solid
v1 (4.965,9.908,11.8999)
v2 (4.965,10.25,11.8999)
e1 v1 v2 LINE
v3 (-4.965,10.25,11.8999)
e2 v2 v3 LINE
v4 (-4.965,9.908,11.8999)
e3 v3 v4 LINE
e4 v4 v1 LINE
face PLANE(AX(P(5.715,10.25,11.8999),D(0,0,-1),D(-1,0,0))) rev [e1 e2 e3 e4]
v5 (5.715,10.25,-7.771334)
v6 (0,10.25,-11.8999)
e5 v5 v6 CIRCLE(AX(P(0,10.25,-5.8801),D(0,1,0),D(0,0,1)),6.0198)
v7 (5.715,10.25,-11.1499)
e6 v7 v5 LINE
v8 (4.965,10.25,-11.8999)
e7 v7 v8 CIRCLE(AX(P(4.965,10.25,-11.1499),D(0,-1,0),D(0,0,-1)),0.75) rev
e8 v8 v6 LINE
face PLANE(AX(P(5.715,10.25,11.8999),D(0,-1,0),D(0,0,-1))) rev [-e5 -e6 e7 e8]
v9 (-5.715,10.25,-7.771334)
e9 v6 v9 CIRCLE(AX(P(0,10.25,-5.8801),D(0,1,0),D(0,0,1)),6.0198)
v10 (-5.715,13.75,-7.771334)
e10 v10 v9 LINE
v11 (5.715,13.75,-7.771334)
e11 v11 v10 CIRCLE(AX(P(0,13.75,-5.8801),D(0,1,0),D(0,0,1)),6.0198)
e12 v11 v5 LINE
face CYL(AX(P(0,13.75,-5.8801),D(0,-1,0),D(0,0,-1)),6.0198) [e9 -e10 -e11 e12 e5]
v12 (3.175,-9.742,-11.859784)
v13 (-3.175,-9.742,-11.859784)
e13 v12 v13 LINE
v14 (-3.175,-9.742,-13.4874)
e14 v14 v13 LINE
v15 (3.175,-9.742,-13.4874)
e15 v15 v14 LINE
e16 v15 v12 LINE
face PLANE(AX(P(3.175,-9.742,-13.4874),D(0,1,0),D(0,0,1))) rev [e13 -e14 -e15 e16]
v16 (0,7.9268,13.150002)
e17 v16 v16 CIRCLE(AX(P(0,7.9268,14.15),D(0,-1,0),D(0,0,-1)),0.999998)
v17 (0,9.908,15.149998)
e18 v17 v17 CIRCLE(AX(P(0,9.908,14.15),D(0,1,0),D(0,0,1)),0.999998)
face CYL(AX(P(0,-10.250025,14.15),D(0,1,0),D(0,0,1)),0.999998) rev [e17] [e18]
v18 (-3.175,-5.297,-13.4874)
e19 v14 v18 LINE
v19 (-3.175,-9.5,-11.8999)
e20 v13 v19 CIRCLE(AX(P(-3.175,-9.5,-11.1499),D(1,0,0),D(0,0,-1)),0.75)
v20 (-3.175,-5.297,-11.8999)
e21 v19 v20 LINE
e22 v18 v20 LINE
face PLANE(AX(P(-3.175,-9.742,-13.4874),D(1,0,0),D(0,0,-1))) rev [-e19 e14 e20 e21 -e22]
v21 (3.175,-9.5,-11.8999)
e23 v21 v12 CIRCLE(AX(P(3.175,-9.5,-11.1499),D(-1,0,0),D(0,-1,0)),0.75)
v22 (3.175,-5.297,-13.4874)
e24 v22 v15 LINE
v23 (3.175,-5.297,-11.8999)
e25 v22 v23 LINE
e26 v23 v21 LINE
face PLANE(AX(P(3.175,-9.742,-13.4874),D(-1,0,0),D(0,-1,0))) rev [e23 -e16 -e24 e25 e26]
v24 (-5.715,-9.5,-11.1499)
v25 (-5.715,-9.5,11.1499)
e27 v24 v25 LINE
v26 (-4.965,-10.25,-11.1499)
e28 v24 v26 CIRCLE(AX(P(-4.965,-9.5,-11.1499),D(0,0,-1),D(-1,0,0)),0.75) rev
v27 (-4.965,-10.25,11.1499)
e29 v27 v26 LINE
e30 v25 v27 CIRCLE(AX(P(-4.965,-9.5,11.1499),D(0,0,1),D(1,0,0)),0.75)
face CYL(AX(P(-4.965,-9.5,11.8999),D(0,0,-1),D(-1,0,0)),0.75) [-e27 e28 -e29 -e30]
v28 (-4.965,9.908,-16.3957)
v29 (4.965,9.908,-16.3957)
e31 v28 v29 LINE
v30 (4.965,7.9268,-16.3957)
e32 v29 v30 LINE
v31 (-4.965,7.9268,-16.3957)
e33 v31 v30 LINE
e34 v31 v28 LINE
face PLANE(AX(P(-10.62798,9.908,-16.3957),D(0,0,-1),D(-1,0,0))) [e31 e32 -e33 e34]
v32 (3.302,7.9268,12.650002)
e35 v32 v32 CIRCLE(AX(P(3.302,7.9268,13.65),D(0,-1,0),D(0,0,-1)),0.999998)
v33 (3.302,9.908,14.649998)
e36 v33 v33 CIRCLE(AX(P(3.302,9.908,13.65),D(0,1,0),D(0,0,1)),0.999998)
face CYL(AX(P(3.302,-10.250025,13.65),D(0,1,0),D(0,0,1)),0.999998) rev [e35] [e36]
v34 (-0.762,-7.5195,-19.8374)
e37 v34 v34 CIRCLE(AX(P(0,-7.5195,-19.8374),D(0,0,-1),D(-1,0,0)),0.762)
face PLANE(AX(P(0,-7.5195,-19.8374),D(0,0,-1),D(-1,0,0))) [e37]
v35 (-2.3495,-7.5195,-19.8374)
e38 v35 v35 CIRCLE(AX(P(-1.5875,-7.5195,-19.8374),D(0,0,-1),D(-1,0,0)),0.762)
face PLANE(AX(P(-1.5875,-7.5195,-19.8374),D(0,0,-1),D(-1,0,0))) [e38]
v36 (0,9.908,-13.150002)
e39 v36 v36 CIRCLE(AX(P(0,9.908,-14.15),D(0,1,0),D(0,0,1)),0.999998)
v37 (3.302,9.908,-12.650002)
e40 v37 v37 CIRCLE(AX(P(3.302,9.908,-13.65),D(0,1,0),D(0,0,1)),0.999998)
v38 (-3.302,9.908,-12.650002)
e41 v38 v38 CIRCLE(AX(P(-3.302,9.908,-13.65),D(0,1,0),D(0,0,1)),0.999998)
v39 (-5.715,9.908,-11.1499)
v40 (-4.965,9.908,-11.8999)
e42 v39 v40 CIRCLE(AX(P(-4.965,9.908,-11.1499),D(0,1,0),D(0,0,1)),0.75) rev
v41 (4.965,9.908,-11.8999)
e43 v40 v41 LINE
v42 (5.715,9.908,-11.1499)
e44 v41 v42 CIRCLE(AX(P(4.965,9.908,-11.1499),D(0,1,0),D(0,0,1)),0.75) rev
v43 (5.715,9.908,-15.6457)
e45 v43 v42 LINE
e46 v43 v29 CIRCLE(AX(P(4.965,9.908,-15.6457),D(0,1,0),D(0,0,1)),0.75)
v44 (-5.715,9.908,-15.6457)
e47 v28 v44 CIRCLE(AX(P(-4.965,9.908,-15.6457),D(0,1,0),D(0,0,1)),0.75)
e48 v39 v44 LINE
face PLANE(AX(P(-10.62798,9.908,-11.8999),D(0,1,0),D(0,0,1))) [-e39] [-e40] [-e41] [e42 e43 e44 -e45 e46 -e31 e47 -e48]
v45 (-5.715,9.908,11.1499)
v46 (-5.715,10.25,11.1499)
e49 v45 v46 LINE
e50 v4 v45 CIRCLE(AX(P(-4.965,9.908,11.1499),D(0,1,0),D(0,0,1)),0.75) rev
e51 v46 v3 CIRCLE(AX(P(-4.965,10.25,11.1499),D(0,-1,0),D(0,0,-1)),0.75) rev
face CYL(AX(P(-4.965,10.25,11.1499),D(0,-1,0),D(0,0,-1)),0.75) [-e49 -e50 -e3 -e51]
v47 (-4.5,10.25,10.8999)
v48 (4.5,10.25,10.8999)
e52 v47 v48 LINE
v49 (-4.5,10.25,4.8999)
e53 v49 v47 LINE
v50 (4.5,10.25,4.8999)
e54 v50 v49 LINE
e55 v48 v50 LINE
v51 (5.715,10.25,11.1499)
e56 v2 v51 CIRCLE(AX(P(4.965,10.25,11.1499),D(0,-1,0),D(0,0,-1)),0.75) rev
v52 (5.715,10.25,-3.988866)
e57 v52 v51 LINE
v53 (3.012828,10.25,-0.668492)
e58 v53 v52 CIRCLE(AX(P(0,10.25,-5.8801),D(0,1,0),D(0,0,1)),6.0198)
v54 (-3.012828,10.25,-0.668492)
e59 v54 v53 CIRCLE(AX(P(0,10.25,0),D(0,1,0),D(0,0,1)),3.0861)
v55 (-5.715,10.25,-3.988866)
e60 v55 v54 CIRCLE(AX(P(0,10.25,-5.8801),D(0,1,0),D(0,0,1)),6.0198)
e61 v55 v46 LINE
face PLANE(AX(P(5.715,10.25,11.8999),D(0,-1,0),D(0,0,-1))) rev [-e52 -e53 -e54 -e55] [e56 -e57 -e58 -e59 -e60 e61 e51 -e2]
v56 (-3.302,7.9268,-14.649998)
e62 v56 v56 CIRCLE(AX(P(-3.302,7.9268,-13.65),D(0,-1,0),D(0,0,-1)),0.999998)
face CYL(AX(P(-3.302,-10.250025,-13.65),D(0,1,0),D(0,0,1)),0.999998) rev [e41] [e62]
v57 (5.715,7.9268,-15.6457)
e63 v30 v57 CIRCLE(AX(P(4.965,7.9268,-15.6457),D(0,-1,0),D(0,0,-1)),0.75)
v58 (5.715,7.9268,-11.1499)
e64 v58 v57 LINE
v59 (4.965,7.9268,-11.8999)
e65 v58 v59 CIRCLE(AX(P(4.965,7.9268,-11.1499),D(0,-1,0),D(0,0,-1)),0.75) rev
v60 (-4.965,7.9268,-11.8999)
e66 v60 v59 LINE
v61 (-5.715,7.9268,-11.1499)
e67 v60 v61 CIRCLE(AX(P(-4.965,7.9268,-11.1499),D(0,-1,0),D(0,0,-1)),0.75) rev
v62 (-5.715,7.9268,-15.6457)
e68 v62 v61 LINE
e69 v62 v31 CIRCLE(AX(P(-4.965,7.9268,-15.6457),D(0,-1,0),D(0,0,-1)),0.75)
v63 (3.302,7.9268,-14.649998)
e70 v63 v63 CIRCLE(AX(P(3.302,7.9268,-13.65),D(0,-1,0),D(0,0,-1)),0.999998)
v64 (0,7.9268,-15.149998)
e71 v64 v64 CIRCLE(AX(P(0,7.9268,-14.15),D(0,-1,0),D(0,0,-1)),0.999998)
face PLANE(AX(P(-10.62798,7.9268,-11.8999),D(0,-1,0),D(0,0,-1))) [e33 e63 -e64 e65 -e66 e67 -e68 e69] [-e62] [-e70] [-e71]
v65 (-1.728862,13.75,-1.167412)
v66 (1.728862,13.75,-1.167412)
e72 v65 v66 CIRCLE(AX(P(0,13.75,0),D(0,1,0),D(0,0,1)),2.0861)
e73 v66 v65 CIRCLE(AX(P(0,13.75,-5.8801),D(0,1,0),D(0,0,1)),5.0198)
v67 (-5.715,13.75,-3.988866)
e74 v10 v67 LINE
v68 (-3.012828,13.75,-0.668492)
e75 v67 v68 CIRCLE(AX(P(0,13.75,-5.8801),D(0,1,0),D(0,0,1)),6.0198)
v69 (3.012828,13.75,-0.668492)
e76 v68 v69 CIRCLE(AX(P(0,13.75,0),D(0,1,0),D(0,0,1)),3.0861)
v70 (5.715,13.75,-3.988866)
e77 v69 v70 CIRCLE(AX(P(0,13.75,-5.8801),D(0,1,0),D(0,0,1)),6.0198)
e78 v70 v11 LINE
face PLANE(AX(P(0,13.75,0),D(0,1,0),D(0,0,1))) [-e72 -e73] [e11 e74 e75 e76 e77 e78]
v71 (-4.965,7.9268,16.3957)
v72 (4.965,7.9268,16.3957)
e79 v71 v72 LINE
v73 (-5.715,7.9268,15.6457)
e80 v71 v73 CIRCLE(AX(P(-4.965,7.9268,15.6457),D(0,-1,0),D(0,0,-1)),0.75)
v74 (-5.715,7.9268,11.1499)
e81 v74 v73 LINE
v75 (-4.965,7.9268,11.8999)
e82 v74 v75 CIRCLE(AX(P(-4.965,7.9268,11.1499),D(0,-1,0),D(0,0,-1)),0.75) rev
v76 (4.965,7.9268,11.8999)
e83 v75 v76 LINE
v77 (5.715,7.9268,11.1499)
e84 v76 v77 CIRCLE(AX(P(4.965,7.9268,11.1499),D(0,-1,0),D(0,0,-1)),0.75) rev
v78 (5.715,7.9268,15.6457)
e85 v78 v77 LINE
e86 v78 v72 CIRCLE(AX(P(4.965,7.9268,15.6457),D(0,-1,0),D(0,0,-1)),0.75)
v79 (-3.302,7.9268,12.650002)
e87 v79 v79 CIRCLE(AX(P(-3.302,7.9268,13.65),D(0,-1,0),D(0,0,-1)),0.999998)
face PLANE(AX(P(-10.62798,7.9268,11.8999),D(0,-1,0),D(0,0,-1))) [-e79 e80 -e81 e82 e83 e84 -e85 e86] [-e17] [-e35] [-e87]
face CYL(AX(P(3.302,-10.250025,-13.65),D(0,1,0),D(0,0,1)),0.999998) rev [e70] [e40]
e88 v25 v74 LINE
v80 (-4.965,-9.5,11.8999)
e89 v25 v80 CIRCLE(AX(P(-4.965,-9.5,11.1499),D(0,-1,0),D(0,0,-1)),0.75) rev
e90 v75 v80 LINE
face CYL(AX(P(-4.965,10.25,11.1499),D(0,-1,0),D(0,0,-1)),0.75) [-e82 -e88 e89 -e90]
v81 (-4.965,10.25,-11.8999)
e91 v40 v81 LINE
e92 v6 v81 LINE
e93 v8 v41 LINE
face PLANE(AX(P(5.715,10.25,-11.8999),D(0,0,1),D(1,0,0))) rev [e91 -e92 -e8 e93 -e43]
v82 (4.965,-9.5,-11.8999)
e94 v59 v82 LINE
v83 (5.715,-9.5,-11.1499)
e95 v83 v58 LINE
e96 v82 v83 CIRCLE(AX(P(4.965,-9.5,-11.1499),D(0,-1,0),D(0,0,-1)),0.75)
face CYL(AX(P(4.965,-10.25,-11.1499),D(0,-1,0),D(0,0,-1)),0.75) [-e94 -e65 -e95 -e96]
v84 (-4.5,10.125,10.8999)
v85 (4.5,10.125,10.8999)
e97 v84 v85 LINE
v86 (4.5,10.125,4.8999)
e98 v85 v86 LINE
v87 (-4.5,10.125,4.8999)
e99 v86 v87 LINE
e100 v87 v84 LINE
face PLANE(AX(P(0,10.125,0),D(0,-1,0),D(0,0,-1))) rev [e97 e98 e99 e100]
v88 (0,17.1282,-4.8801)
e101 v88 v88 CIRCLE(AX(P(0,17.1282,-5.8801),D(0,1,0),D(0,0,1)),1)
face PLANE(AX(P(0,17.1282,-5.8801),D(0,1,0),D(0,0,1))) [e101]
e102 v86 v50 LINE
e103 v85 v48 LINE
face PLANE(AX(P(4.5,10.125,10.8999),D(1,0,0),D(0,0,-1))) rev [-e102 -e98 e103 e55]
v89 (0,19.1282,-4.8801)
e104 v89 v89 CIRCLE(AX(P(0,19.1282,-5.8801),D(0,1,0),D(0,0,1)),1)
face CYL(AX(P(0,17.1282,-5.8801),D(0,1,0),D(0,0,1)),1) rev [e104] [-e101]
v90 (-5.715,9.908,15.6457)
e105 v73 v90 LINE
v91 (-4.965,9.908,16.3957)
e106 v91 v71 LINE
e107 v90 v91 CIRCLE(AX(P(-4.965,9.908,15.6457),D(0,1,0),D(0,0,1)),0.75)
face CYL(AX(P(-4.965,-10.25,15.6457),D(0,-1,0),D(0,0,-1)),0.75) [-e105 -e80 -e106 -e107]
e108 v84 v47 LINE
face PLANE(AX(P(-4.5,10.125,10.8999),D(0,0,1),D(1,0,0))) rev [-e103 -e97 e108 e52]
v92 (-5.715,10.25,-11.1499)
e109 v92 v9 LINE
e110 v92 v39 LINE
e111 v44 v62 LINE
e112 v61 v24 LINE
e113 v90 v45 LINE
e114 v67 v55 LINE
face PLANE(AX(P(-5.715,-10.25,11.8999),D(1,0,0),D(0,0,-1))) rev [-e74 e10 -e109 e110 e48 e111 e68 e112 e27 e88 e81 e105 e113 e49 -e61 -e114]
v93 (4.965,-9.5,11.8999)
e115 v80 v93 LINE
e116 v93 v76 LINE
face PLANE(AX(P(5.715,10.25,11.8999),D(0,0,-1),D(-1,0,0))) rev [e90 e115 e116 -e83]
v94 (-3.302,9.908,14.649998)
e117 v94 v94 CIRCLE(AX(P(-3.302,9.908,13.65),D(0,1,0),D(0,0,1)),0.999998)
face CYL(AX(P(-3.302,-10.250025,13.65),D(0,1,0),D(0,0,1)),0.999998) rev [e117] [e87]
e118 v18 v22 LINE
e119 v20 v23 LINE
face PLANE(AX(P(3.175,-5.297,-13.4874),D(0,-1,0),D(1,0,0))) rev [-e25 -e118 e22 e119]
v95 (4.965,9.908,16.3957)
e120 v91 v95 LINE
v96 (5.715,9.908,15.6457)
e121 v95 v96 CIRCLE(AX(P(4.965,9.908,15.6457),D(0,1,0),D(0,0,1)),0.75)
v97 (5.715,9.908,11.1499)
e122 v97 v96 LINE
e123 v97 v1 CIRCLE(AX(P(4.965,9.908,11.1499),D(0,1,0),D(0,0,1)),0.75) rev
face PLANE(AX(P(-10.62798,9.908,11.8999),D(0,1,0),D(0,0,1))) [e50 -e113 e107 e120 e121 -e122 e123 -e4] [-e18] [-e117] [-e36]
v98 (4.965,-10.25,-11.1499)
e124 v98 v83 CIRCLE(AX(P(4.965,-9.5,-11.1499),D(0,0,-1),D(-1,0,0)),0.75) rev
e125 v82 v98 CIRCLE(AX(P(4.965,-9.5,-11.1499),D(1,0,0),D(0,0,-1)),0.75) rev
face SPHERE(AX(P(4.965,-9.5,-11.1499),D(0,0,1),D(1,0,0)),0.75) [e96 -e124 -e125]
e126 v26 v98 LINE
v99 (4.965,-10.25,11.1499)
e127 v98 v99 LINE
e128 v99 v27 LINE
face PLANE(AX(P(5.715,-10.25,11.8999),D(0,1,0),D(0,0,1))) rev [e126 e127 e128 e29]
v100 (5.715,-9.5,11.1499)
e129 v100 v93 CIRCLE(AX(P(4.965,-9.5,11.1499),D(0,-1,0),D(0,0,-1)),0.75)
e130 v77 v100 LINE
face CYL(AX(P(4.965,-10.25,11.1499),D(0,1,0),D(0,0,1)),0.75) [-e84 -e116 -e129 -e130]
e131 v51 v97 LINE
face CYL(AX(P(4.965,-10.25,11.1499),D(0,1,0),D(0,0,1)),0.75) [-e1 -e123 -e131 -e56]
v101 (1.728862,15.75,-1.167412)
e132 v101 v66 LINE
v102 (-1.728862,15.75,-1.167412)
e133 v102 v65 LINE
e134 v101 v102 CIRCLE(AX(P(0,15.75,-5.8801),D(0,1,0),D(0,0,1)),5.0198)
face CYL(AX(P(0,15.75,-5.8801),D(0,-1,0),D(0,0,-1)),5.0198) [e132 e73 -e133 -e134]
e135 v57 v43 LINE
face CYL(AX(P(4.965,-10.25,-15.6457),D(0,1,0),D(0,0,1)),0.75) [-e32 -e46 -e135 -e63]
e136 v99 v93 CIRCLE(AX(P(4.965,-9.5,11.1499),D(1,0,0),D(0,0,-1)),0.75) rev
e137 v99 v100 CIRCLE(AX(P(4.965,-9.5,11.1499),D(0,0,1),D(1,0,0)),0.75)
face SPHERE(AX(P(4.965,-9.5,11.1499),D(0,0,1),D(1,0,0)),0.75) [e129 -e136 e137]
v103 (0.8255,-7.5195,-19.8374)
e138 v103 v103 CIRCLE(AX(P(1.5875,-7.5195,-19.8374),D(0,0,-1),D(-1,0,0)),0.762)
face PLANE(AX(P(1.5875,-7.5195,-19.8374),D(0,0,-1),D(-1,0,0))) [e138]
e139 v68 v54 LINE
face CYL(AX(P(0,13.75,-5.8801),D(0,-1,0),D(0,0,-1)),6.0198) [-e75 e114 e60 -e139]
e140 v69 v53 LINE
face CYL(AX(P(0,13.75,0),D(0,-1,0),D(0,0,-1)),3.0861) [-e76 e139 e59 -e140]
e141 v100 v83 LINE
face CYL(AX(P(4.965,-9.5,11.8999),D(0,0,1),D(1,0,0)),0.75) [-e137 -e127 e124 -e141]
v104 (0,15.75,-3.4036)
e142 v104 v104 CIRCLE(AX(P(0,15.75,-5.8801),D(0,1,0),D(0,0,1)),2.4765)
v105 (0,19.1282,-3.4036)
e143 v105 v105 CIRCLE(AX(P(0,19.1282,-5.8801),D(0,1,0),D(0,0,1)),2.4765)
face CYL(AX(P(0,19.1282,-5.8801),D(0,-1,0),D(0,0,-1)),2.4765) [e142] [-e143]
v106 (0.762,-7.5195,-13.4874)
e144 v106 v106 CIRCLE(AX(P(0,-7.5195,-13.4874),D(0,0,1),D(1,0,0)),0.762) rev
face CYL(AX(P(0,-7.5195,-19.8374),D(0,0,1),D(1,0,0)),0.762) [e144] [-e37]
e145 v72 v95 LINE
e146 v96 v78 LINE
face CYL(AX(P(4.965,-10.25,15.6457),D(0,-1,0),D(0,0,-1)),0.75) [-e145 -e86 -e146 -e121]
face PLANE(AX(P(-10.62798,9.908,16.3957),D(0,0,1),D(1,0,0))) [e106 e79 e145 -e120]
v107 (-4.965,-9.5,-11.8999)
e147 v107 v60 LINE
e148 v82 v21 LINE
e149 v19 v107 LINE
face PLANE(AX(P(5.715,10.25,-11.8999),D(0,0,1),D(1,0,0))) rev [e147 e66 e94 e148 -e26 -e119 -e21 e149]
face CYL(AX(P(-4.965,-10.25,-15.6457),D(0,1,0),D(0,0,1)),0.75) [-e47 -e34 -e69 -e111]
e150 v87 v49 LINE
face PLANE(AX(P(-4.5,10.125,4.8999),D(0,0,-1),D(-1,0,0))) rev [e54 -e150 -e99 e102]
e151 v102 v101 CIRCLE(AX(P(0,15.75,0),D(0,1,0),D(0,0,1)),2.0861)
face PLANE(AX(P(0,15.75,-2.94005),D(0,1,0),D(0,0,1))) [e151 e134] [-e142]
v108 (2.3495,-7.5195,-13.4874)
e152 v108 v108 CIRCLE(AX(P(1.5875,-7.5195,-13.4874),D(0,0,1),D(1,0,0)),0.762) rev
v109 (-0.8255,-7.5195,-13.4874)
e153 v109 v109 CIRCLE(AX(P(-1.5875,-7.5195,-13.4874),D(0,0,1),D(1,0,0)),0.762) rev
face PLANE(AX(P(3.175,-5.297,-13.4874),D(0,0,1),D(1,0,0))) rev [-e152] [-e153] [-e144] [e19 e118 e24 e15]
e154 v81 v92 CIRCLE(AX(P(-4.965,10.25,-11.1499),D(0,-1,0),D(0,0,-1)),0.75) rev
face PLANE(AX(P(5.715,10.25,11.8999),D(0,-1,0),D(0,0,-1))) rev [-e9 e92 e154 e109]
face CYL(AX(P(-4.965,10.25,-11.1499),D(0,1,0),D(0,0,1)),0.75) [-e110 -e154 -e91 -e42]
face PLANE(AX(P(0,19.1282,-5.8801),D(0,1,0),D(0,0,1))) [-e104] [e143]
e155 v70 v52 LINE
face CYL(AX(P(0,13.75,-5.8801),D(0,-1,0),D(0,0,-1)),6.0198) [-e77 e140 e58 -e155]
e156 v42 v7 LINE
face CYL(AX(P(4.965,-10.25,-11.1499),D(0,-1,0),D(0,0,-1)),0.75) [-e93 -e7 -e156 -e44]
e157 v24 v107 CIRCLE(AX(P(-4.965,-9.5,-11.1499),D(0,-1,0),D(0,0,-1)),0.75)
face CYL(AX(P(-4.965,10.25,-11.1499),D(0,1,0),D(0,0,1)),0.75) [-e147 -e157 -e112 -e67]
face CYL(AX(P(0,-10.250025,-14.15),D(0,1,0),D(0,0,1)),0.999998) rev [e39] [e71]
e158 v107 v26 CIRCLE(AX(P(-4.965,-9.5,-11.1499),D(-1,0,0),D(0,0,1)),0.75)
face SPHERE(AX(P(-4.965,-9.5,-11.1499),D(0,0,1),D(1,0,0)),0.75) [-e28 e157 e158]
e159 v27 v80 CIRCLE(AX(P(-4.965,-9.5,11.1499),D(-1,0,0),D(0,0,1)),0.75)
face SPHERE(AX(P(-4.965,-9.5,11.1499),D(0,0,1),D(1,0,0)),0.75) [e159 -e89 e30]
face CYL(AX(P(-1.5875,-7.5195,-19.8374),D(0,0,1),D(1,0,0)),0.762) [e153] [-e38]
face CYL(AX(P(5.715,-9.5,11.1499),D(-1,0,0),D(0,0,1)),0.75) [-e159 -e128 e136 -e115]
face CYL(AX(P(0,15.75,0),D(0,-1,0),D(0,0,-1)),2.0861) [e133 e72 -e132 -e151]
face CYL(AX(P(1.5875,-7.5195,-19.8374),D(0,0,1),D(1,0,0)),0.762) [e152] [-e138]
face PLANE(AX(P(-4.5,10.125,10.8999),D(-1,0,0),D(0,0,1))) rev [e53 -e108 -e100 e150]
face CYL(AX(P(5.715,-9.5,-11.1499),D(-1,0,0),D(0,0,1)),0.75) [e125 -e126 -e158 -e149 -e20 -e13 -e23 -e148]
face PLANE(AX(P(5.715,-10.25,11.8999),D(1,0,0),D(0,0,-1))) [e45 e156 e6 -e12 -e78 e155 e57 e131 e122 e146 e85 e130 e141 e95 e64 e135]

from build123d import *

# Parameters (mm, degrees)
EXTRUDE1_DEPTH      = 5.715
EXTRUDE1_DEPTH_BACK = 5.715
SKETCH1_W           = 23.7998
SKETCH1_H           = 20.5
BOSS_EXTRUDE7_DEPTH = 3.5
BOSS_EXTRUDE8_DEPTH = 2
SKETCH3_W           = 4.4958
SKETCH3_H           = 1.9812
EXTRUDE2_DEPTH      = 11.43
SKETCH4_R           = 0.999998
EXTRUDE3_DEPTH      = 27.604983884
SKETCH5_W           = 6.35
SKETCH5_H           = 4.445
BOSS_EXTRUDE1_DEPTH = 1.5875
SKETCH6_R           = 0.762
BOSS_EXTRUDE4_DEPTH = 6.35
SKETCH8_R           = 2.4765
BOSS_EXTRUDE6_DEPTH = 3.3782
SKETCH9_W           = 9
SKETCH9_H           = 6
CUT_EXTRUDE2_DEPTH  = 0.125
SKETCH11_R          = 1
CUT_EXTRUDE3_DEPTH  = 2
FILLET1_R           = 0.75


with BuildPart() as part:
    # Sketch1 → Extrude1 (new, two sides: drawn at the far end of the back side and taken through both)
    with BuildSketch(Plane(origin=(0, 0, 0), x_dir=(0, 0, -1), z_dir=(1, 0, 0)).offset(-EXTRUDE1_DEPTH_BACK)):
        Rectangle(SKETCH1_W, SKETCH1_H)
    extrude(amount=EXTRUDE1_DEPTH + EXTRUDE1_DEPTH_BACK)

    # Sketch2 → Boss-Extrude7 (add)
    with BuildSketch(Plane(origin=(0, 10.25, 0), x_dir=(-1, 0, 0), z_dir=(0, 1, 0))):
        with BuildLine():
            Line((5.715, -7.771334264), (5.715, -3.988865736))
            ThreePointArc((5.715, -3.988865736), (4.669043342, -2.080359705), (3.012827896, -0.668491793))
            ThreePointArc((3.012827896, -0.668491793), (0, 3.0861), (-3.012827896, -0.668491793))
            ThreePointArc((-3.012827896, -0.668491793), (-4.669043342, -2.080359705), (-5.715, -3.988865736))
            Line((-5.715, -3.988865736), (-5.715, -7.771334264))
            ThreePointArc((-5.715, -7.771334264), (0, -11.8999), (5.715, -7.771334264))
        make_face()
    extrude(amount=BOSS_EXTRUDE7_DEPTH)

    # Sketch10 → Boss-Extrude8 (add)
    with BuildSketch(Plane(origin=(0, 13.75, 0), x_dir=(1, 0, 0), z_dir=(0, 1, 0))):
        with BuildLine():
            ThreePointArc((-1.728861682, 1.167411879), (0, -2.0861), (1.728861682, 1.167411879))
            ThreePointArc((1.728861682, 1.167411879), (0, 10.8999), (-1.728861682, 1.167411879))
        make_face()
    extrude(amount=BOSS_EXTRUDE8_DEPTH)

    # Sketch3 → Extrude2 (add)
    with BuildSketch(Plane(origin=(5.715, 0, 0), x_dir=(0, 0, -1), z_dir=(1, 0, 0))):
        with Locations((-14.1478, 8.9174)):
            Rectangle(SKETCH3_W, SKETCH3_H)
        with Locations((14.1478, 8.9174)):
            Rectangle(SKETCH3_W, SKETCH3_H)
    extrude(amount=-EXTRUDE2_DEPTH)

    # Sketch4 → Extrude3 (cut, through all)
    with BuildSketch(Plane(origin=(0, 9.908, 0), x_dir=(1, 0, 0), z_dir=(0, 1, 0))):
        with Locations(Location((0, 14.15, 0), (0, 0, 270))):
            Circle(SKETCH4_R)
        with Locations(Location((0, -14.15, 0), (0, 0, 270))):
            Circle(SKETCH4_R)
        with Locations(Location((-3.302, 13.65, 0), (0, 0, 270))):
            Circle(SKETCH4_R)
        with Locations(Location((3.302, 13.65, 0), (0, 0, 270))):
            Circle(SKETCH4_R)
        with Locations(Location((3.302, -13.65, 0), (0, 0, 270))):
            Circle(SKETCH4_R)
        with Locations(Location((-3.302, -13.65, 0), (0, 0, 270))):
            Circle(SKETCH4_R)
    extrude(amount=-EXTRUDE3_DEPTH, mode=Mode.SUBTRACT)

    # Sketch5 → Boss-Extrude1 (add)
    with BuildSketch(Plane(origin=(0, 0, -11.8999), x_dir=(-1, 0, 0), z_dir=(0, 0, -1))):
        with Locations((0, -7.5195)):
            Rectangle(SKETCH5_W, SKETCH5_H)
    extrude(amount=BOSS_EXTRUDE1_DEPTH)

    # Sketch6 → Boss-Extrude4 (add)
    with BuildSketch(Plane(origin=(0, 0, -13.4874), x_dir=(-1, 0, 0), z_dir=(0, 0, -1))):
        with Locations(Location((0, -7.5195, 0), (0, 0, 180))):
            Circle(SKETCH6_R)
        with Locations(Location((-1.5875, -7.5195, 0), (0, 0, 180))):
            Circle(SKETCH6_R)
        with Locations(Location((1.5875, -7.5195, 0), (0, 0, 180))):
            Circle(SKETCH6_R)
    extrude(amount=BOSS_EXTRUDE4_DEPTH)

    # Sketch8 → Boss-Extrude6 (add)
    with BuildSketch(Plane(origin=(0, 15.75, 0), x_dir=(1, 0, 0), z_dir=(0, 1, 0))):
        with Locations(Location((0, 5.8801, 0), (0, 0, 270))):
            Circle(SKETCH8_R)
    extrude(amount=BOSS_EXTRUDE6_DEPTH)

    # Sketch9 → Cut-Extrude2 (cut)
    with BuildSketch(Plane(origin=(0, 10.25, 0), x_dir=(1, 0, 0), z_dir=(0, 1, 0))):
        with Locations((0, -7.8999)):
            Rectangle(SKETCH9_W, SKETCH9_H)
    extrude(amount=-CUT_EXTRUDE2_DEPTH, mode=Mode.SUBTRACT)

    # Sketch11 → Cut-Extrude3 (cut)
    with BuildSketch(Plane(origin=(0, 19.1282, 0), x_dir=(1, 0, 0), z_dir=(0, 1, 0))):
        with Locations(Location((0, 5.8801, 0), (0, 0, 270))):
            Circle(SKETCH11_R)
    extrude(amount=-CUT_EXTRUDE3_DEPTH, mode=Mode.SUBTRACT)

    # Fillet1
    # the kernel refuses this fillet: 0.75 mm, written as the material it takes off along each edge
    with BuildSketch(Plane(origin=(-4.965, -9.5, 11.1499), x_dir=(0, -1, 0), z_dir=(-1, 0, 0))) as fillet1_piece_1_section:
        Polygon((0, 0), (FILLET1_R, 0), (FILLET1_R, FILLET1_R), (0, FILLET1_R), align=None)
    fillet1_piece_1 = extrude(amount=FILLET1_R, mode=Mode.PRIVATE)
    fillet1_piece_1 = fillet1_piece_1 - Plane(origin=(-4.965, -9.5, 11.1499), x_dir=(0, 0.7071067811865475, -0.7071067811865475), z_dir=(-1, 0, 0)) * Sphere(FILLET1_R, mode=Mode.PRIVATE)
    add(fillet1_piece_1, mode=Mode.SUBTRACT)
    with BuildSketch(Plane(origin=(-4.965, -9.5, -11.1499), x_dir=(0, 0, -1), z_dir=(-1, 0, 0))) as fillet1_piece_2_section:
        Polygon((0, 0), (FILLET1_R, 0), (FILLET1_R, FILLET1_R), (0, FILLET1_R), align=None)
    fillet1_piece_2 = extrude(amount=FILLET1_R, mode=Mode.PRIVATE)
    fillet1_piece_2 = fillet1_piece_2 - Plane(origin=(-4.965, -9.5, -11.1499), x_dir=(0, 0.7071067811865475, 0.7071067811865475), z_dir=(-1, 0, 0)) * Sphere(FILLET1_R, mode=Mode.PRIVATE)
    add(fillet1_piece_2, mode=Mode.SUBTRACT)
    with BuildSketch(Plane(origin=(4.965, -9.5, 11.1499), x_dir=(0, -1, 0), z_dir=(1, 0, 0))) as fillet1_piece_3_section:
        Polygon((0, 0), (FILLET1_R, 0), (FILLET1_R, -FILLET1_R), (0, -FILLET1_R), align=None)
    fillet1_piece_3 = extrude(amount=FILLET1_R, mode=Mode.PRIVATE)
    fillet1_piece_3 = fillet1_piece_3 - Plane(origin=(4.965, -9.5, 11.1499), x_dir=(0, 0.7071067811865475, -0.7071067811865475), z_dir=(1, 0, 0)) * Sphere(FILLET1_R, mode=Mode.PRIVATE)
    add(fillet1_piece_3, mode=Mode.SUBTRACT)
    with BuildSketch(Plane(origin=(4.965, -9.5, -11.1499), x_dir=(0, 0, -1), z_dir=(1, 0, 0))) as fillet1_piece_4_section:
        Polygon((0, 0), (FILLET1_R, 0), (FILLET1_R, -FILLET1_R), (0, -FILLET1_R), align=None)
    fillet1_piece_4 = extrude(amount=FILLET1_R, mode=Mode.PRIVATE)
    fillet1_piece_4 = fillet1_piece_4 - Plane(origin=(4.965, -9.5, -11.1499), x_dir=(0, 0.7071067811865475, 0.7071067811865475), z_dir=(1, 0, 0)) * Sphere(FILLET1_R, mode=Mode.PRIVATE)
    add(fillet1_piece_4, mode=Mode.SUBTRACT)
    with BuildSketch(Plane(origin=(-5.715, -9.5, 11.8999), x_dir=(0, 0, -1), z_dir=(0, 1, 0)), Plane(origin=(-5.715, 7.9268, -11.8999), x_dir=(0, 0, 1), z_dir=(0, -1, 0))) as fillet1_piece_5:
        with BuildLine():
            CenterArc((FILLET1_R, -FILLET1_R), FILLET1_R, 90, 90)
            Line((0, -FILLET1_R), (0, 0))
            Line((0, 0), (FILLET1_R, 0))
        make_face()
    extrude(amount=17.4268, mode=Mode.SUBTRACT)
    with BuildSketch(Plane(origin=(-5.715, 11.783, -16.3957), x_dir=(0, 0, 1), z_dir=(0, -1, 0)), Plane(origin=(5.715, 11.783, 16.3957), x_dir=(0, 0, -1), z_dir=(0, -1, 0))) as fillet1_piece_6:
        with BuildLine():
            CenterArc((FILLET1_R, -FILLET1_R), FILLET1_R, 90, 90)
            Line((0, -FILLET1_R), (0, 0))
            Line((0, 0), (FILLET1_R, 0))
        make_face()
    extrude(amount=5.7312, mode=Mode.SUBTRACT)
    with BuildSketch(Plane(origin=(5.715, 11.783, -16.3957), x_dir=(0, 0, 1), z_dir=(0, -1, 0)), Plane(origin=(-5.715, 11.783, 16.3957), x_dir=(0, 0, -1), z_dir=(0, -1, 0))) as fillet1_piece_7:
        with BuildLine():
            CenterArc((FILLET1_R, FILLET1_R), FILLET1_R, 180, 90)
            Line((0, FILLET1_R), (0, 0))
            Line((0, 0), (FILLET1_R, 0))
        make_face()
    extrude(amount=5.7312, mode=Mode.SUBTRACT)
    with BuildSketch(Plane(origin=(-5.715, 12.125, -11.8999), x_dir=(0, 0, 1), z_dir=(0, -1, 0)), Plane(origin=(5.715, 9.908, 11.8999), x_dir=(-1, 0, 0), z_dir=(0, 1, 0))) as fillet1_piece_8:
        with BuildLine():
            CenterArc((FILLET1_R, -FILLET1_R), FILLET1_R, 90, 90)
            Line((0, -FILLET1_R), (0, 0))
            Line((0, 0), (FILLET1_R, 0))
        make_face()
    extrude(amount=2.217, mode=Mode.SUBTRACT)
    with BuildSketch(Plane(origin=(5.715, 12.125, -11.8999), x_dir=(0, 0, 1), z_dir=(0, -1, 0)), Plane(origin=(-5.715, 9.908, 11.8999), x_dir=(1, 0, 0), z_dir=(0, 1, 0))) as fillet1_piece_9:
        with BuildLine():
            CenterArc((FILLET1_R, FILLET1_R), FILLET1_R, 180, 90)
            Line((0, FILLET1_R), (0, 0))
            Line((0, 0), (FILLET1_R, 0))
        make_face()
    extrude(amount=2.217, mode=Mode.SUBTRACT)
    with BuildSketch(Plane(origin=(-4.965, -10.25, 11.8999), x_dir=(0, 0, -1), z_dir=(1, 0, 0))) as fillet1_piece_10:
        with BuildLine():
            CenterArc((FILLET1_R, FILLET1_R), FILLET1_R, 180, 90)
            Line((0, FILLET1_R), (0, 0))
            Line((0, 0), (FILLET1_R, 0))
        make_face()
    extrude(amount=9.93, mode=Mode.SUBTRACT)
    with BuildSketch(Plane(origin=(4.965, -10.25, -11.8999), x_dir=(0, 1, 0), z_dir=(-1, 0, 0))) as fillet1_piece_11_section:
        with BuildLine():
            CenterArc((FILLET1_R, -FILLET1_R), FILLET1_R, 90, 90)
            Line((0, -FILLET1_R), (0, 0))
            Line((0, 0), (FILLET1_R, 0))
        make_face()
    fillet1_piece_11 = extrude(amount=9.93, mode=Mode.PRIVATE)
    fillet1_piece_11 = split(fillet1_piece_11, bisect_by=Plane(origin=(4.07, -9.742, -11.898273589), z_dir=(0, 1, 0)), keep=Keep.TOP, mode=Mode.PRIVATE)
    fillet1_piece_11 = split(fillet1_piece_11, bisect_by=Plane(origin=(3.175, -9.649501984, -11.898273589), z_dir=(1, 0, 0)), keep=Keep.TOP, mode=Mode.PRIVATE)
    add(fillet1_piece_11, mode=Mode.SUBTRACT)
    with BuildSketch(Plane(origin=(4.965, -10.25, -11.8999), x_dir=(0, 1, 0), z_dir=(-1, 0, 0))) as fillet1_piece_12_section:
        with BuildLine():
            CenterArc((FILLET1_R, -FILLET1_R), FILLET1_R, 90, 90)
            Line((0, -FILLET1_R), (0, 0))
            Line((0, 0), (FILLET1_R, 0))
        make_face()
    fillet1_piece_12 = extrude(amount=9.93, mode=Mode.PRIVATE)
    fillet1_piece_12 = split(fillet1_piece_12, bisect_by=Plane(origin=(4.07, -9.742, -11.721694977), z_dir=(0, -1, 0)), keep=Keep.TOP, mode=Mode.PRIVATE)
    fillet1_piece_12 = split(fillet1_piece_12, bisect_by=Plane(origin=(3.175, -10.101739238, -11.721694977), z_dir=(1, 0, 0)), keep=Keep.TOP, mode=Mode.PRIVATE)
    add(fillet1_piece_12, mode=Mode.SUBTRACT)
    with BuildSketch(Plane(origin=(4.965, -10.25, -11.8999), x_dir=(0, 1, 0), z_dir=(-1, 0, 0))) as fillet1_piece_13_section:
        with BuildLine():
            CenterArc((FILLET1_R, -FILLET1_R), FILLET1_R, 90, 90)
            Line((0, -FILLET1_R), (0, 0))
            Line((0, 0), (FILLET1_R, 0))
        make_face()
    fillet1_piece_13 = extrude(amount=9.93, mode=Mode.PRIVATE)
    fillet1_piece_13 = split(fillet1_piece_13, bisect_by=Plane(origin=(0, -9.742, -11.721694977), z_dir=(0, -1, 0)), keep=Keep.TOP, mode=Mode.PRIVATE)
    fillet1_piece_13 = split(fillet1_piece_13, bisect_by=Plane(origin=(-3.175, -10.101739238, -11.721694977), z_dir=(1, 0, 0)), keep=Keep.TOP, mode=Mode.PRIVATE)
    fillet1_piece_13 = split(fillet1_piece_13, bisect_by=Plane(origin=(3.175, -10.101739238, -11.721694977), z_dir=(-1, 0, 0)), keep=Keep.TOP, mode=Mode.PRIVATE)
    add(fillet1_piece_13, mode=Mode.SUBTRACT)
    with BuildSketch(Plane(origin=(4.965, -10.25, -11.8999), x_dir=(0, 1, 0), z_dir=(-1, 0, 0))) as fillet1_piece_14_section:
        with BuildLine():
            CenterArc((FILLET1_R, -FILLET1_R), FILLET1_R, 90, 90)
            Line((0, -FILLET1_R), (0, 0))
            Line((0, 0), (FILLET1_R, 0))
        make_face()
    fillet1_piece_14 = extrude(amount=9.93, mode=Mode.PRIVATE)
    fillet1_piece_14 = split(fillet1_piece_14, bisect_by=Plane(origin=(-4.07, -9.742, -11.898273589), z_dir=(0, 1, 0)), keep=Keep.TOP, mode=Mode.PRIVATE)
    fillet1_piece_14 = split(fillet1_piece_14, bisect_by=Plane(origin=(-3.175, -9.649501984, -11.898273589), z_dir=(-1, 0, 0)), keep=Keep.TOP, mode=Mode.PRIVATE)
    add(fillet1_piece_14, mode=Mode.SUBTRACT)
    with BuildSketch(Plane(origin=(4.965, -10.25, -11.8999), x_dir=(0, 1, 0), z_dir=(-1, 0, 0))) as fillet1_piece_15_section:
        with BuildLine():
            CenterArc((FILLET1_R, -FILLET1_R), FILLET1_R, 90, 90)
            Line((0, -FILLET1_R), (0, 0))
            Line((0, 0), (FILLET1_R, 0))
        make_face()
    fillet1_piece_15 = extrude(amount=9.93, mode=Mode.PRIVATE)
    fillet1_piece_15 = split(fillet1_piece_15, bisect_by=Plane(origin=(-4.07, -9.742, -11.721694977), z_dir=(0, -1, 0)), keep=Keep.TOP, mode=Mode.PRIVATE)
    fillet1_piece_15 = split(fillet1_piece_15, bisect_by=Plane(origin=(-3.175, -10.101739238, -11.721694977), z_dir=(-1, 0, 0)), keep=Keep.TOP, mode=Mode.PRIVATE)
    add(fillet1_piece_15, mode=Mode.SUBTRACT)
    with BuildSketch(Plane(origin=(-5.715, -10.25, -11.1499), x_dir=(0, 1, 0), z_dir=(0, 0, 1))) as fillet1_piece_16:
        with BuildLine():
            CenterArc((FILLET1_R, -FILLET1_R), FILLET1_R, 90, 90)
            Line((0, -FILLET1_R), (0, 0))
            Line((0, 0), (FILLET1_R, 0))
        make_face()
    extrude(amount=22.2998, mode=Mode.SUBTRACT)
    with BuildSketch(Plane(origin=(5.715, -9.5, 11.8999), x_dir=(0, 0, -1), z_dir=(0, 1, 0)), Plane(origin=(5.715, 7.9268, -11.8999), x_dir=(0, 0, 1), z_dir=(0, -1, 0))) as fillet1_piece_17:
        with BuildLine():
            CenterArc((FILLET1_R, FILLET1_R), FILLET1_R, 180, 90)
            Line((0, FILLET1_R), (0, 0))
            Line((0, 0), (FILLET1_R, 0))
        make_face()
    extrude(amount=17.4268, mode=Mode.SUBTRACT)
    with BuildSketch(Plane(origin=(5.715, -10.25, -11.1499), x_dir=(0, 1, 0), z_dir=(0, 0, 1))) as fillet1_piece_18:
        with BuildLine():
            CenterArc((FILLET1_R, FILLET1_R), FILLET1_R, 180, 90)
            Line((0, FILLET1_R), (0, 0))
            Line((0, 0), (FILLET1_R, 0))
        make_face()
    extrude(amount=22.2998, mode=Mode.SUBTRACT)


solid = part.part
